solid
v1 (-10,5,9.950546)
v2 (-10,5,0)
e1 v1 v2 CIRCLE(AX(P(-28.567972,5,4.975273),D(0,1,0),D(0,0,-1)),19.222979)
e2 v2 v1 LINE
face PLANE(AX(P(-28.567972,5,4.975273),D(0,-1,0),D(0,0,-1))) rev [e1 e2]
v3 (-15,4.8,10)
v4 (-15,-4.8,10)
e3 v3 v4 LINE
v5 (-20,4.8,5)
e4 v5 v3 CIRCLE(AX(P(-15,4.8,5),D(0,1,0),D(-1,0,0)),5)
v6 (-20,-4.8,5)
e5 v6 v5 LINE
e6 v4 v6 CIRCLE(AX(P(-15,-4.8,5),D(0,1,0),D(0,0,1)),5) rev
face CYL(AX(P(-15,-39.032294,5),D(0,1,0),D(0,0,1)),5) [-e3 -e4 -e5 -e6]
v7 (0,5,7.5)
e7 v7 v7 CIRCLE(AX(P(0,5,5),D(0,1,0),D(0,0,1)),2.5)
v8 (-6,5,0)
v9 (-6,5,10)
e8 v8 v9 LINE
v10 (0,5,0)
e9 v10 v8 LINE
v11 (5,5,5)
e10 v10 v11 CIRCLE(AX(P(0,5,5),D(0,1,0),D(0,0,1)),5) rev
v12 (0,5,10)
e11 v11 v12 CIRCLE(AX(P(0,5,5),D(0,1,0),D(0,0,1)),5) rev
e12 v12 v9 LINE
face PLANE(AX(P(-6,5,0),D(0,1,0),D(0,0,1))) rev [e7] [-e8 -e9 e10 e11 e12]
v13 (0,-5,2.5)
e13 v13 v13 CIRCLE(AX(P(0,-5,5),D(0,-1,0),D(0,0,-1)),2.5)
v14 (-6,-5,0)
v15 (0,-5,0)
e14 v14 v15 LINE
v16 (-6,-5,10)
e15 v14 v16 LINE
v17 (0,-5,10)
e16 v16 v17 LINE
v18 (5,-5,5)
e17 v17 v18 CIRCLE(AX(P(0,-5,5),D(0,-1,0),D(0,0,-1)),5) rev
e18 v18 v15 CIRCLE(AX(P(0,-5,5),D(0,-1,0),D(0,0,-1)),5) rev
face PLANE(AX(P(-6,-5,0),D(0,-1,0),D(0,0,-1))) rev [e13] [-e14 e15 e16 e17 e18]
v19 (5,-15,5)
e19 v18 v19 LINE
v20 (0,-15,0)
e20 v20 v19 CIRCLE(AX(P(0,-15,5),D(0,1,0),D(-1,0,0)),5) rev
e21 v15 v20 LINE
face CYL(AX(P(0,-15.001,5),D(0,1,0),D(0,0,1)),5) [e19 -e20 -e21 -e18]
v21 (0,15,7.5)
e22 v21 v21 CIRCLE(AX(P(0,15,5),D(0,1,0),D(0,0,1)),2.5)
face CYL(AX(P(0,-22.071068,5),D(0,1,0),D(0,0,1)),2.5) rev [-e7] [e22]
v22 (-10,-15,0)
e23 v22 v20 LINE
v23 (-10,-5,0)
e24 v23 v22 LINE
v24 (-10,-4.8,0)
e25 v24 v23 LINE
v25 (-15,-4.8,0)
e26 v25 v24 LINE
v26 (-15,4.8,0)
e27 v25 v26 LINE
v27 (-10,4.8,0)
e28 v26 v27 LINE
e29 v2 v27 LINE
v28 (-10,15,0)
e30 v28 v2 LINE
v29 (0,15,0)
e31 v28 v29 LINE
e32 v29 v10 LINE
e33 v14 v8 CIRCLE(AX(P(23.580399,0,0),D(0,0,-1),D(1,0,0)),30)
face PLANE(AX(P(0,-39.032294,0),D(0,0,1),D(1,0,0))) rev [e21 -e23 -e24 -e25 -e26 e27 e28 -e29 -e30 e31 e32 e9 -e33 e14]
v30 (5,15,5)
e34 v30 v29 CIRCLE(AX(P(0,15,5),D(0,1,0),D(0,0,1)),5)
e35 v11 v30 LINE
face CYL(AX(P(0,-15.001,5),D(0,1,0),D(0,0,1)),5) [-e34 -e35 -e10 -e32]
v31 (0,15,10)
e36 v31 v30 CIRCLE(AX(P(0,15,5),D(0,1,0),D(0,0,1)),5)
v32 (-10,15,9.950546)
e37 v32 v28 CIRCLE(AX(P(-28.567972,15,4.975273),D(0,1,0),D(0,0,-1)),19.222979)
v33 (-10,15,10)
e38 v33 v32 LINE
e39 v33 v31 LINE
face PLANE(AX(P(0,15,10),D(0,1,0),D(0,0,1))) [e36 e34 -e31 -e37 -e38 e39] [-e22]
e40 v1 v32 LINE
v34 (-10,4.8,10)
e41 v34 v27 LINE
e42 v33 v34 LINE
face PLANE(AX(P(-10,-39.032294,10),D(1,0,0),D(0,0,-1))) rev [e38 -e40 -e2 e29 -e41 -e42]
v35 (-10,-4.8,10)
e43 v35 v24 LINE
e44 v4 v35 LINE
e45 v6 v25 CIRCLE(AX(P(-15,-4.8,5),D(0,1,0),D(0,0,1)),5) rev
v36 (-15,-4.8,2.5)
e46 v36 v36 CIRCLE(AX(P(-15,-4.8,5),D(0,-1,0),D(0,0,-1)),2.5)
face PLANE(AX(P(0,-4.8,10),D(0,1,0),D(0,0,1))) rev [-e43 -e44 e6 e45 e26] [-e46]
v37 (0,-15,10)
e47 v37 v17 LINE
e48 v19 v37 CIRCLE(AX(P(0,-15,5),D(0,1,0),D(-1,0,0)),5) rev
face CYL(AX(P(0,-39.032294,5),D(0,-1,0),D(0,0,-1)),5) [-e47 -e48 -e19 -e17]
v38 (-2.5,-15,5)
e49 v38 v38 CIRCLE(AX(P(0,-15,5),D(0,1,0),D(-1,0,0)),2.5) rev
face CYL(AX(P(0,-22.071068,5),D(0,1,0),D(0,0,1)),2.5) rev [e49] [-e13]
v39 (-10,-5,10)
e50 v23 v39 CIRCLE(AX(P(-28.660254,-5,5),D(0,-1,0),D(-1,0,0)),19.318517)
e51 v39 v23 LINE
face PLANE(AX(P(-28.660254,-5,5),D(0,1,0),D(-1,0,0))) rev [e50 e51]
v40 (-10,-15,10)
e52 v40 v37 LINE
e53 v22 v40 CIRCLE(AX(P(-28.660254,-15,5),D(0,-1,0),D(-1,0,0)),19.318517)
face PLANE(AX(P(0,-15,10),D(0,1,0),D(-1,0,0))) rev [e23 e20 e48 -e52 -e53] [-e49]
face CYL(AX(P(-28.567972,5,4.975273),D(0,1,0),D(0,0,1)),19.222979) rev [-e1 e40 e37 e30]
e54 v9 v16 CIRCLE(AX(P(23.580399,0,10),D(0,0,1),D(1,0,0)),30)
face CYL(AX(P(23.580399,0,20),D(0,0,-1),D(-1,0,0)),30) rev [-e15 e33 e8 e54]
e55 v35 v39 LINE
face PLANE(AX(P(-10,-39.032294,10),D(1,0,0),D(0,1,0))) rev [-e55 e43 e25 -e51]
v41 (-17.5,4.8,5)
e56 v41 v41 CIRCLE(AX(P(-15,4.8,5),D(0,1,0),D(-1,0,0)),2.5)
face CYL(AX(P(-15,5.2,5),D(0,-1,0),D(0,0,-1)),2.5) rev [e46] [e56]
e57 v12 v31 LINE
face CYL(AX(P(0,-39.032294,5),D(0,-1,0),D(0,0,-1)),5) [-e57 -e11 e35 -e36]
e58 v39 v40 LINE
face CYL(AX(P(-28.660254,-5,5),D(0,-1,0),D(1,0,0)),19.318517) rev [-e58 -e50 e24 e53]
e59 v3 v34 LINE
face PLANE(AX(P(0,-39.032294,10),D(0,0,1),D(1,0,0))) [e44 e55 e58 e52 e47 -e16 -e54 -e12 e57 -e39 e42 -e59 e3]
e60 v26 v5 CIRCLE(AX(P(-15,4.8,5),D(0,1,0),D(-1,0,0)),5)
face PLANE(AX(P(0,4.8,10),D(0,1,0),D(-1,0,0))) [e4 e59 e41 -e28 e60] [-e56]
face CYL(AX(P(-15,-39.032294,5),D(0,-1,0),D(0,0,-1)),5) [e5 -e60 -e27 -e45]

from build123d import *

# Parameters (mm, degrees)
RESSALTO_EXTRUS_O1_DEPTH = 10
ESBO_O2_R                = 2.5
CORTE_EXTRUS_O1_DEPTH    = 10
FILETE1_R                = 5
CORTE_EXTRUS_O4_DEPTH    = 10
CORTE_EXTRUS_O5_DEPTH    = 10
CORTE_EXTRUS_O6_REACH    = 39.417
ESBO_O7_W                = 15
ESBO_O7_H                = 10
ESBO_O8_W                = 11
ESBO_O8_H                = 10
CORTE_EXTRUS_O7_DEPTH    = 27.925824036
CORTE_EXTRUS_O8_DEPTH    = 20
CORTE_EXTRUS_O9_REACH    = 39.417
ESBO_O10_R               = 2.5
FILETE2_R                = 5


with BuildPart() as part:
    # Esboço1 → Ressalto-extrusão1 (new body)
    with BuildSketch(Plane.XY):
        Polygon((-10, -7.5), (20, 15), (-10, 15), (-10, 4.8), (-20, 4.8), (-20, -4.8), (-10, -4.8), align=None)
        Polygon((20, -15), (20, 15), (-10, -7.5), (-10, -15), align=None)
    extrude(amount=RESSALTO_EXTRUS_O1_DEPTH)

    # Esboço2 → Corte-extrusão1 (cut)
    with BuildSketch(Plane.XZ.offset(4.8)):
        with Locations(Location((-15, 5, 0), (0, 0, 270))):
            Circle(ESBO_O2_R)
    extrude(amount=-CORTE_EXTRUS_O1_DEPTH, mode=Mode.SUBTRACT)

    # Filete1
    filete1_edges = [part.edges().sort_by_distance(p)[0] for p in [
        (-20, 0, 0),
        (-20, 0, 10),
    ]]
    fillet(filete1_edges, radius=FILETE1_R - 0.0001)  # a hair under: the kernel refuses the full size

    # Esboço5 → Corte-extrusão4 (cut)
    with BuildSketch(Plane.XZ.offset(15)):
        with BuildLine():
            Line((-10, 10), (-10, 0))
            ThreePointArc((-10, 0), (-9.341737512, 5), (-10, 10))
        make_face()
    extrude(amount=-CORTE_EXTRUS_O4_DEPTH, mode=Mode.SUBTRACT)

    # Esboço6 → Corte-extrusão5 (cut)
    with BuildSketch(Plane(origin=(0, 15, 0), x_dir=(1, 0, 0), z_dir=(0, 1, 0))):
        with BuildLine():
            Line((-10, -9.950546275), (-10, 0))
            ThreePointArc((-10, 0), (-9.344992865, -4.975273137), (-10, -9.950546275))
        make_face()
    extrude(amount=-CORTE_EXTRUS_O5_DEPTH, mode=Mode.SUBTRACT)

    # Esboço7 → Corte-extrusão6 (cut, up to next)
    with BuildSketch(Plane(origin=(0, 15, 0), x_dir=(1, 0, 0), z_dir=(0, 1, 0)), mode=Mode.PRIVATE) as corte_extrus_o6_sk1:
        with Locations((12.5, -5)):
            Rectangle(ESBO_O7_W, ESBO_O7_H)
    corte_extrus_o6_tool1 = extrude(corte_extrus_o6_sk1.sketch, amount=-CORTE_EXTRUS_O6_REACH, mode=Mode.PRIVATE) & part.part
    add(corte_extrus_o6_tool1.solids().sort_by_distance((12.5, 15, 5))[0], mode=Mode.SUBTRACT)

    # Esboço8 → Corte-extrusão7 (cut, through all)
    with BuildSketch(Plane.XY.offset(10)):
        with Locations((-0.5, 0)):
            Rectangle(ESBO_O8_W, ESBO_O8_H)
    extrude(amount=-CORTE_EXTRUS_O7_DEPTH, mode=Mode.SUBTRACT)

    # Esboço9 → Corte-extrusão8 (cut)
    with BuildSketch(Plane(origin=(0, 0, 0), x_dir=(-1, 0, 0), z_dir=(0, 0, -1))):
        with BuildLine():
            Line((6, -5), (6, 5))
            ThreePointArc((6, 5), (6.419601085, 0), (6, -5))
        make_face()
    extrude(amount=-CORTE_EXTRUS_O8_DEPTH, mode=Mode.SUBTRACT)

    # Corte-extrusão9: up to this face of the body (flat: up to its plane)
    corte_extrus_o9_end = Plane(part.part.faces().sort_by_distance((-2.281136508, -15, 5))[0])
    # Esboço10 → Corte-extrusão9 (cut, up to the picked face)
    with BuildSketch(Plane(origin=(0, 15, 0), x_dir=(1, 0, 0), z_dir=(0, 1, 0)), mode=Mode.PRIVATE) as corte_extrus_o9_sk1:
        with Locations(Location((0, -5, 0), (0, 0, 180))):
            Circle(ESBO_O10_R)
    corte_extrus_o9_tool1 = split(extrude(corte_extrus_o9_sk1.sketch, amount=-CORTE_EXTRUS_O9_REACH, mode=Mode.PRIVATE), bisect_by=corte_extrus_o9_end, keep=Keep.BOTH, mode=Mode.PRIVATE)
    add(corte_extrus_o9_tool1.solids().sort_by(Axis((0, 15, 5), (0, -1, 0)))[0], mode=Mode.SUBTRACT)

    # Filete2
    filete2_edges = [part.edges().sort_by_distance(p)[0] for p in [
        (5, -10, 0),
        (5, -10, 10),
        (5, 10, 10),
        (5, 10, 0),
    ]]
    fillet(filete2_edges, radius=FILETE2_R - 0.0001)  # a hair under: the kernel refuses the full size


solid = part.part
